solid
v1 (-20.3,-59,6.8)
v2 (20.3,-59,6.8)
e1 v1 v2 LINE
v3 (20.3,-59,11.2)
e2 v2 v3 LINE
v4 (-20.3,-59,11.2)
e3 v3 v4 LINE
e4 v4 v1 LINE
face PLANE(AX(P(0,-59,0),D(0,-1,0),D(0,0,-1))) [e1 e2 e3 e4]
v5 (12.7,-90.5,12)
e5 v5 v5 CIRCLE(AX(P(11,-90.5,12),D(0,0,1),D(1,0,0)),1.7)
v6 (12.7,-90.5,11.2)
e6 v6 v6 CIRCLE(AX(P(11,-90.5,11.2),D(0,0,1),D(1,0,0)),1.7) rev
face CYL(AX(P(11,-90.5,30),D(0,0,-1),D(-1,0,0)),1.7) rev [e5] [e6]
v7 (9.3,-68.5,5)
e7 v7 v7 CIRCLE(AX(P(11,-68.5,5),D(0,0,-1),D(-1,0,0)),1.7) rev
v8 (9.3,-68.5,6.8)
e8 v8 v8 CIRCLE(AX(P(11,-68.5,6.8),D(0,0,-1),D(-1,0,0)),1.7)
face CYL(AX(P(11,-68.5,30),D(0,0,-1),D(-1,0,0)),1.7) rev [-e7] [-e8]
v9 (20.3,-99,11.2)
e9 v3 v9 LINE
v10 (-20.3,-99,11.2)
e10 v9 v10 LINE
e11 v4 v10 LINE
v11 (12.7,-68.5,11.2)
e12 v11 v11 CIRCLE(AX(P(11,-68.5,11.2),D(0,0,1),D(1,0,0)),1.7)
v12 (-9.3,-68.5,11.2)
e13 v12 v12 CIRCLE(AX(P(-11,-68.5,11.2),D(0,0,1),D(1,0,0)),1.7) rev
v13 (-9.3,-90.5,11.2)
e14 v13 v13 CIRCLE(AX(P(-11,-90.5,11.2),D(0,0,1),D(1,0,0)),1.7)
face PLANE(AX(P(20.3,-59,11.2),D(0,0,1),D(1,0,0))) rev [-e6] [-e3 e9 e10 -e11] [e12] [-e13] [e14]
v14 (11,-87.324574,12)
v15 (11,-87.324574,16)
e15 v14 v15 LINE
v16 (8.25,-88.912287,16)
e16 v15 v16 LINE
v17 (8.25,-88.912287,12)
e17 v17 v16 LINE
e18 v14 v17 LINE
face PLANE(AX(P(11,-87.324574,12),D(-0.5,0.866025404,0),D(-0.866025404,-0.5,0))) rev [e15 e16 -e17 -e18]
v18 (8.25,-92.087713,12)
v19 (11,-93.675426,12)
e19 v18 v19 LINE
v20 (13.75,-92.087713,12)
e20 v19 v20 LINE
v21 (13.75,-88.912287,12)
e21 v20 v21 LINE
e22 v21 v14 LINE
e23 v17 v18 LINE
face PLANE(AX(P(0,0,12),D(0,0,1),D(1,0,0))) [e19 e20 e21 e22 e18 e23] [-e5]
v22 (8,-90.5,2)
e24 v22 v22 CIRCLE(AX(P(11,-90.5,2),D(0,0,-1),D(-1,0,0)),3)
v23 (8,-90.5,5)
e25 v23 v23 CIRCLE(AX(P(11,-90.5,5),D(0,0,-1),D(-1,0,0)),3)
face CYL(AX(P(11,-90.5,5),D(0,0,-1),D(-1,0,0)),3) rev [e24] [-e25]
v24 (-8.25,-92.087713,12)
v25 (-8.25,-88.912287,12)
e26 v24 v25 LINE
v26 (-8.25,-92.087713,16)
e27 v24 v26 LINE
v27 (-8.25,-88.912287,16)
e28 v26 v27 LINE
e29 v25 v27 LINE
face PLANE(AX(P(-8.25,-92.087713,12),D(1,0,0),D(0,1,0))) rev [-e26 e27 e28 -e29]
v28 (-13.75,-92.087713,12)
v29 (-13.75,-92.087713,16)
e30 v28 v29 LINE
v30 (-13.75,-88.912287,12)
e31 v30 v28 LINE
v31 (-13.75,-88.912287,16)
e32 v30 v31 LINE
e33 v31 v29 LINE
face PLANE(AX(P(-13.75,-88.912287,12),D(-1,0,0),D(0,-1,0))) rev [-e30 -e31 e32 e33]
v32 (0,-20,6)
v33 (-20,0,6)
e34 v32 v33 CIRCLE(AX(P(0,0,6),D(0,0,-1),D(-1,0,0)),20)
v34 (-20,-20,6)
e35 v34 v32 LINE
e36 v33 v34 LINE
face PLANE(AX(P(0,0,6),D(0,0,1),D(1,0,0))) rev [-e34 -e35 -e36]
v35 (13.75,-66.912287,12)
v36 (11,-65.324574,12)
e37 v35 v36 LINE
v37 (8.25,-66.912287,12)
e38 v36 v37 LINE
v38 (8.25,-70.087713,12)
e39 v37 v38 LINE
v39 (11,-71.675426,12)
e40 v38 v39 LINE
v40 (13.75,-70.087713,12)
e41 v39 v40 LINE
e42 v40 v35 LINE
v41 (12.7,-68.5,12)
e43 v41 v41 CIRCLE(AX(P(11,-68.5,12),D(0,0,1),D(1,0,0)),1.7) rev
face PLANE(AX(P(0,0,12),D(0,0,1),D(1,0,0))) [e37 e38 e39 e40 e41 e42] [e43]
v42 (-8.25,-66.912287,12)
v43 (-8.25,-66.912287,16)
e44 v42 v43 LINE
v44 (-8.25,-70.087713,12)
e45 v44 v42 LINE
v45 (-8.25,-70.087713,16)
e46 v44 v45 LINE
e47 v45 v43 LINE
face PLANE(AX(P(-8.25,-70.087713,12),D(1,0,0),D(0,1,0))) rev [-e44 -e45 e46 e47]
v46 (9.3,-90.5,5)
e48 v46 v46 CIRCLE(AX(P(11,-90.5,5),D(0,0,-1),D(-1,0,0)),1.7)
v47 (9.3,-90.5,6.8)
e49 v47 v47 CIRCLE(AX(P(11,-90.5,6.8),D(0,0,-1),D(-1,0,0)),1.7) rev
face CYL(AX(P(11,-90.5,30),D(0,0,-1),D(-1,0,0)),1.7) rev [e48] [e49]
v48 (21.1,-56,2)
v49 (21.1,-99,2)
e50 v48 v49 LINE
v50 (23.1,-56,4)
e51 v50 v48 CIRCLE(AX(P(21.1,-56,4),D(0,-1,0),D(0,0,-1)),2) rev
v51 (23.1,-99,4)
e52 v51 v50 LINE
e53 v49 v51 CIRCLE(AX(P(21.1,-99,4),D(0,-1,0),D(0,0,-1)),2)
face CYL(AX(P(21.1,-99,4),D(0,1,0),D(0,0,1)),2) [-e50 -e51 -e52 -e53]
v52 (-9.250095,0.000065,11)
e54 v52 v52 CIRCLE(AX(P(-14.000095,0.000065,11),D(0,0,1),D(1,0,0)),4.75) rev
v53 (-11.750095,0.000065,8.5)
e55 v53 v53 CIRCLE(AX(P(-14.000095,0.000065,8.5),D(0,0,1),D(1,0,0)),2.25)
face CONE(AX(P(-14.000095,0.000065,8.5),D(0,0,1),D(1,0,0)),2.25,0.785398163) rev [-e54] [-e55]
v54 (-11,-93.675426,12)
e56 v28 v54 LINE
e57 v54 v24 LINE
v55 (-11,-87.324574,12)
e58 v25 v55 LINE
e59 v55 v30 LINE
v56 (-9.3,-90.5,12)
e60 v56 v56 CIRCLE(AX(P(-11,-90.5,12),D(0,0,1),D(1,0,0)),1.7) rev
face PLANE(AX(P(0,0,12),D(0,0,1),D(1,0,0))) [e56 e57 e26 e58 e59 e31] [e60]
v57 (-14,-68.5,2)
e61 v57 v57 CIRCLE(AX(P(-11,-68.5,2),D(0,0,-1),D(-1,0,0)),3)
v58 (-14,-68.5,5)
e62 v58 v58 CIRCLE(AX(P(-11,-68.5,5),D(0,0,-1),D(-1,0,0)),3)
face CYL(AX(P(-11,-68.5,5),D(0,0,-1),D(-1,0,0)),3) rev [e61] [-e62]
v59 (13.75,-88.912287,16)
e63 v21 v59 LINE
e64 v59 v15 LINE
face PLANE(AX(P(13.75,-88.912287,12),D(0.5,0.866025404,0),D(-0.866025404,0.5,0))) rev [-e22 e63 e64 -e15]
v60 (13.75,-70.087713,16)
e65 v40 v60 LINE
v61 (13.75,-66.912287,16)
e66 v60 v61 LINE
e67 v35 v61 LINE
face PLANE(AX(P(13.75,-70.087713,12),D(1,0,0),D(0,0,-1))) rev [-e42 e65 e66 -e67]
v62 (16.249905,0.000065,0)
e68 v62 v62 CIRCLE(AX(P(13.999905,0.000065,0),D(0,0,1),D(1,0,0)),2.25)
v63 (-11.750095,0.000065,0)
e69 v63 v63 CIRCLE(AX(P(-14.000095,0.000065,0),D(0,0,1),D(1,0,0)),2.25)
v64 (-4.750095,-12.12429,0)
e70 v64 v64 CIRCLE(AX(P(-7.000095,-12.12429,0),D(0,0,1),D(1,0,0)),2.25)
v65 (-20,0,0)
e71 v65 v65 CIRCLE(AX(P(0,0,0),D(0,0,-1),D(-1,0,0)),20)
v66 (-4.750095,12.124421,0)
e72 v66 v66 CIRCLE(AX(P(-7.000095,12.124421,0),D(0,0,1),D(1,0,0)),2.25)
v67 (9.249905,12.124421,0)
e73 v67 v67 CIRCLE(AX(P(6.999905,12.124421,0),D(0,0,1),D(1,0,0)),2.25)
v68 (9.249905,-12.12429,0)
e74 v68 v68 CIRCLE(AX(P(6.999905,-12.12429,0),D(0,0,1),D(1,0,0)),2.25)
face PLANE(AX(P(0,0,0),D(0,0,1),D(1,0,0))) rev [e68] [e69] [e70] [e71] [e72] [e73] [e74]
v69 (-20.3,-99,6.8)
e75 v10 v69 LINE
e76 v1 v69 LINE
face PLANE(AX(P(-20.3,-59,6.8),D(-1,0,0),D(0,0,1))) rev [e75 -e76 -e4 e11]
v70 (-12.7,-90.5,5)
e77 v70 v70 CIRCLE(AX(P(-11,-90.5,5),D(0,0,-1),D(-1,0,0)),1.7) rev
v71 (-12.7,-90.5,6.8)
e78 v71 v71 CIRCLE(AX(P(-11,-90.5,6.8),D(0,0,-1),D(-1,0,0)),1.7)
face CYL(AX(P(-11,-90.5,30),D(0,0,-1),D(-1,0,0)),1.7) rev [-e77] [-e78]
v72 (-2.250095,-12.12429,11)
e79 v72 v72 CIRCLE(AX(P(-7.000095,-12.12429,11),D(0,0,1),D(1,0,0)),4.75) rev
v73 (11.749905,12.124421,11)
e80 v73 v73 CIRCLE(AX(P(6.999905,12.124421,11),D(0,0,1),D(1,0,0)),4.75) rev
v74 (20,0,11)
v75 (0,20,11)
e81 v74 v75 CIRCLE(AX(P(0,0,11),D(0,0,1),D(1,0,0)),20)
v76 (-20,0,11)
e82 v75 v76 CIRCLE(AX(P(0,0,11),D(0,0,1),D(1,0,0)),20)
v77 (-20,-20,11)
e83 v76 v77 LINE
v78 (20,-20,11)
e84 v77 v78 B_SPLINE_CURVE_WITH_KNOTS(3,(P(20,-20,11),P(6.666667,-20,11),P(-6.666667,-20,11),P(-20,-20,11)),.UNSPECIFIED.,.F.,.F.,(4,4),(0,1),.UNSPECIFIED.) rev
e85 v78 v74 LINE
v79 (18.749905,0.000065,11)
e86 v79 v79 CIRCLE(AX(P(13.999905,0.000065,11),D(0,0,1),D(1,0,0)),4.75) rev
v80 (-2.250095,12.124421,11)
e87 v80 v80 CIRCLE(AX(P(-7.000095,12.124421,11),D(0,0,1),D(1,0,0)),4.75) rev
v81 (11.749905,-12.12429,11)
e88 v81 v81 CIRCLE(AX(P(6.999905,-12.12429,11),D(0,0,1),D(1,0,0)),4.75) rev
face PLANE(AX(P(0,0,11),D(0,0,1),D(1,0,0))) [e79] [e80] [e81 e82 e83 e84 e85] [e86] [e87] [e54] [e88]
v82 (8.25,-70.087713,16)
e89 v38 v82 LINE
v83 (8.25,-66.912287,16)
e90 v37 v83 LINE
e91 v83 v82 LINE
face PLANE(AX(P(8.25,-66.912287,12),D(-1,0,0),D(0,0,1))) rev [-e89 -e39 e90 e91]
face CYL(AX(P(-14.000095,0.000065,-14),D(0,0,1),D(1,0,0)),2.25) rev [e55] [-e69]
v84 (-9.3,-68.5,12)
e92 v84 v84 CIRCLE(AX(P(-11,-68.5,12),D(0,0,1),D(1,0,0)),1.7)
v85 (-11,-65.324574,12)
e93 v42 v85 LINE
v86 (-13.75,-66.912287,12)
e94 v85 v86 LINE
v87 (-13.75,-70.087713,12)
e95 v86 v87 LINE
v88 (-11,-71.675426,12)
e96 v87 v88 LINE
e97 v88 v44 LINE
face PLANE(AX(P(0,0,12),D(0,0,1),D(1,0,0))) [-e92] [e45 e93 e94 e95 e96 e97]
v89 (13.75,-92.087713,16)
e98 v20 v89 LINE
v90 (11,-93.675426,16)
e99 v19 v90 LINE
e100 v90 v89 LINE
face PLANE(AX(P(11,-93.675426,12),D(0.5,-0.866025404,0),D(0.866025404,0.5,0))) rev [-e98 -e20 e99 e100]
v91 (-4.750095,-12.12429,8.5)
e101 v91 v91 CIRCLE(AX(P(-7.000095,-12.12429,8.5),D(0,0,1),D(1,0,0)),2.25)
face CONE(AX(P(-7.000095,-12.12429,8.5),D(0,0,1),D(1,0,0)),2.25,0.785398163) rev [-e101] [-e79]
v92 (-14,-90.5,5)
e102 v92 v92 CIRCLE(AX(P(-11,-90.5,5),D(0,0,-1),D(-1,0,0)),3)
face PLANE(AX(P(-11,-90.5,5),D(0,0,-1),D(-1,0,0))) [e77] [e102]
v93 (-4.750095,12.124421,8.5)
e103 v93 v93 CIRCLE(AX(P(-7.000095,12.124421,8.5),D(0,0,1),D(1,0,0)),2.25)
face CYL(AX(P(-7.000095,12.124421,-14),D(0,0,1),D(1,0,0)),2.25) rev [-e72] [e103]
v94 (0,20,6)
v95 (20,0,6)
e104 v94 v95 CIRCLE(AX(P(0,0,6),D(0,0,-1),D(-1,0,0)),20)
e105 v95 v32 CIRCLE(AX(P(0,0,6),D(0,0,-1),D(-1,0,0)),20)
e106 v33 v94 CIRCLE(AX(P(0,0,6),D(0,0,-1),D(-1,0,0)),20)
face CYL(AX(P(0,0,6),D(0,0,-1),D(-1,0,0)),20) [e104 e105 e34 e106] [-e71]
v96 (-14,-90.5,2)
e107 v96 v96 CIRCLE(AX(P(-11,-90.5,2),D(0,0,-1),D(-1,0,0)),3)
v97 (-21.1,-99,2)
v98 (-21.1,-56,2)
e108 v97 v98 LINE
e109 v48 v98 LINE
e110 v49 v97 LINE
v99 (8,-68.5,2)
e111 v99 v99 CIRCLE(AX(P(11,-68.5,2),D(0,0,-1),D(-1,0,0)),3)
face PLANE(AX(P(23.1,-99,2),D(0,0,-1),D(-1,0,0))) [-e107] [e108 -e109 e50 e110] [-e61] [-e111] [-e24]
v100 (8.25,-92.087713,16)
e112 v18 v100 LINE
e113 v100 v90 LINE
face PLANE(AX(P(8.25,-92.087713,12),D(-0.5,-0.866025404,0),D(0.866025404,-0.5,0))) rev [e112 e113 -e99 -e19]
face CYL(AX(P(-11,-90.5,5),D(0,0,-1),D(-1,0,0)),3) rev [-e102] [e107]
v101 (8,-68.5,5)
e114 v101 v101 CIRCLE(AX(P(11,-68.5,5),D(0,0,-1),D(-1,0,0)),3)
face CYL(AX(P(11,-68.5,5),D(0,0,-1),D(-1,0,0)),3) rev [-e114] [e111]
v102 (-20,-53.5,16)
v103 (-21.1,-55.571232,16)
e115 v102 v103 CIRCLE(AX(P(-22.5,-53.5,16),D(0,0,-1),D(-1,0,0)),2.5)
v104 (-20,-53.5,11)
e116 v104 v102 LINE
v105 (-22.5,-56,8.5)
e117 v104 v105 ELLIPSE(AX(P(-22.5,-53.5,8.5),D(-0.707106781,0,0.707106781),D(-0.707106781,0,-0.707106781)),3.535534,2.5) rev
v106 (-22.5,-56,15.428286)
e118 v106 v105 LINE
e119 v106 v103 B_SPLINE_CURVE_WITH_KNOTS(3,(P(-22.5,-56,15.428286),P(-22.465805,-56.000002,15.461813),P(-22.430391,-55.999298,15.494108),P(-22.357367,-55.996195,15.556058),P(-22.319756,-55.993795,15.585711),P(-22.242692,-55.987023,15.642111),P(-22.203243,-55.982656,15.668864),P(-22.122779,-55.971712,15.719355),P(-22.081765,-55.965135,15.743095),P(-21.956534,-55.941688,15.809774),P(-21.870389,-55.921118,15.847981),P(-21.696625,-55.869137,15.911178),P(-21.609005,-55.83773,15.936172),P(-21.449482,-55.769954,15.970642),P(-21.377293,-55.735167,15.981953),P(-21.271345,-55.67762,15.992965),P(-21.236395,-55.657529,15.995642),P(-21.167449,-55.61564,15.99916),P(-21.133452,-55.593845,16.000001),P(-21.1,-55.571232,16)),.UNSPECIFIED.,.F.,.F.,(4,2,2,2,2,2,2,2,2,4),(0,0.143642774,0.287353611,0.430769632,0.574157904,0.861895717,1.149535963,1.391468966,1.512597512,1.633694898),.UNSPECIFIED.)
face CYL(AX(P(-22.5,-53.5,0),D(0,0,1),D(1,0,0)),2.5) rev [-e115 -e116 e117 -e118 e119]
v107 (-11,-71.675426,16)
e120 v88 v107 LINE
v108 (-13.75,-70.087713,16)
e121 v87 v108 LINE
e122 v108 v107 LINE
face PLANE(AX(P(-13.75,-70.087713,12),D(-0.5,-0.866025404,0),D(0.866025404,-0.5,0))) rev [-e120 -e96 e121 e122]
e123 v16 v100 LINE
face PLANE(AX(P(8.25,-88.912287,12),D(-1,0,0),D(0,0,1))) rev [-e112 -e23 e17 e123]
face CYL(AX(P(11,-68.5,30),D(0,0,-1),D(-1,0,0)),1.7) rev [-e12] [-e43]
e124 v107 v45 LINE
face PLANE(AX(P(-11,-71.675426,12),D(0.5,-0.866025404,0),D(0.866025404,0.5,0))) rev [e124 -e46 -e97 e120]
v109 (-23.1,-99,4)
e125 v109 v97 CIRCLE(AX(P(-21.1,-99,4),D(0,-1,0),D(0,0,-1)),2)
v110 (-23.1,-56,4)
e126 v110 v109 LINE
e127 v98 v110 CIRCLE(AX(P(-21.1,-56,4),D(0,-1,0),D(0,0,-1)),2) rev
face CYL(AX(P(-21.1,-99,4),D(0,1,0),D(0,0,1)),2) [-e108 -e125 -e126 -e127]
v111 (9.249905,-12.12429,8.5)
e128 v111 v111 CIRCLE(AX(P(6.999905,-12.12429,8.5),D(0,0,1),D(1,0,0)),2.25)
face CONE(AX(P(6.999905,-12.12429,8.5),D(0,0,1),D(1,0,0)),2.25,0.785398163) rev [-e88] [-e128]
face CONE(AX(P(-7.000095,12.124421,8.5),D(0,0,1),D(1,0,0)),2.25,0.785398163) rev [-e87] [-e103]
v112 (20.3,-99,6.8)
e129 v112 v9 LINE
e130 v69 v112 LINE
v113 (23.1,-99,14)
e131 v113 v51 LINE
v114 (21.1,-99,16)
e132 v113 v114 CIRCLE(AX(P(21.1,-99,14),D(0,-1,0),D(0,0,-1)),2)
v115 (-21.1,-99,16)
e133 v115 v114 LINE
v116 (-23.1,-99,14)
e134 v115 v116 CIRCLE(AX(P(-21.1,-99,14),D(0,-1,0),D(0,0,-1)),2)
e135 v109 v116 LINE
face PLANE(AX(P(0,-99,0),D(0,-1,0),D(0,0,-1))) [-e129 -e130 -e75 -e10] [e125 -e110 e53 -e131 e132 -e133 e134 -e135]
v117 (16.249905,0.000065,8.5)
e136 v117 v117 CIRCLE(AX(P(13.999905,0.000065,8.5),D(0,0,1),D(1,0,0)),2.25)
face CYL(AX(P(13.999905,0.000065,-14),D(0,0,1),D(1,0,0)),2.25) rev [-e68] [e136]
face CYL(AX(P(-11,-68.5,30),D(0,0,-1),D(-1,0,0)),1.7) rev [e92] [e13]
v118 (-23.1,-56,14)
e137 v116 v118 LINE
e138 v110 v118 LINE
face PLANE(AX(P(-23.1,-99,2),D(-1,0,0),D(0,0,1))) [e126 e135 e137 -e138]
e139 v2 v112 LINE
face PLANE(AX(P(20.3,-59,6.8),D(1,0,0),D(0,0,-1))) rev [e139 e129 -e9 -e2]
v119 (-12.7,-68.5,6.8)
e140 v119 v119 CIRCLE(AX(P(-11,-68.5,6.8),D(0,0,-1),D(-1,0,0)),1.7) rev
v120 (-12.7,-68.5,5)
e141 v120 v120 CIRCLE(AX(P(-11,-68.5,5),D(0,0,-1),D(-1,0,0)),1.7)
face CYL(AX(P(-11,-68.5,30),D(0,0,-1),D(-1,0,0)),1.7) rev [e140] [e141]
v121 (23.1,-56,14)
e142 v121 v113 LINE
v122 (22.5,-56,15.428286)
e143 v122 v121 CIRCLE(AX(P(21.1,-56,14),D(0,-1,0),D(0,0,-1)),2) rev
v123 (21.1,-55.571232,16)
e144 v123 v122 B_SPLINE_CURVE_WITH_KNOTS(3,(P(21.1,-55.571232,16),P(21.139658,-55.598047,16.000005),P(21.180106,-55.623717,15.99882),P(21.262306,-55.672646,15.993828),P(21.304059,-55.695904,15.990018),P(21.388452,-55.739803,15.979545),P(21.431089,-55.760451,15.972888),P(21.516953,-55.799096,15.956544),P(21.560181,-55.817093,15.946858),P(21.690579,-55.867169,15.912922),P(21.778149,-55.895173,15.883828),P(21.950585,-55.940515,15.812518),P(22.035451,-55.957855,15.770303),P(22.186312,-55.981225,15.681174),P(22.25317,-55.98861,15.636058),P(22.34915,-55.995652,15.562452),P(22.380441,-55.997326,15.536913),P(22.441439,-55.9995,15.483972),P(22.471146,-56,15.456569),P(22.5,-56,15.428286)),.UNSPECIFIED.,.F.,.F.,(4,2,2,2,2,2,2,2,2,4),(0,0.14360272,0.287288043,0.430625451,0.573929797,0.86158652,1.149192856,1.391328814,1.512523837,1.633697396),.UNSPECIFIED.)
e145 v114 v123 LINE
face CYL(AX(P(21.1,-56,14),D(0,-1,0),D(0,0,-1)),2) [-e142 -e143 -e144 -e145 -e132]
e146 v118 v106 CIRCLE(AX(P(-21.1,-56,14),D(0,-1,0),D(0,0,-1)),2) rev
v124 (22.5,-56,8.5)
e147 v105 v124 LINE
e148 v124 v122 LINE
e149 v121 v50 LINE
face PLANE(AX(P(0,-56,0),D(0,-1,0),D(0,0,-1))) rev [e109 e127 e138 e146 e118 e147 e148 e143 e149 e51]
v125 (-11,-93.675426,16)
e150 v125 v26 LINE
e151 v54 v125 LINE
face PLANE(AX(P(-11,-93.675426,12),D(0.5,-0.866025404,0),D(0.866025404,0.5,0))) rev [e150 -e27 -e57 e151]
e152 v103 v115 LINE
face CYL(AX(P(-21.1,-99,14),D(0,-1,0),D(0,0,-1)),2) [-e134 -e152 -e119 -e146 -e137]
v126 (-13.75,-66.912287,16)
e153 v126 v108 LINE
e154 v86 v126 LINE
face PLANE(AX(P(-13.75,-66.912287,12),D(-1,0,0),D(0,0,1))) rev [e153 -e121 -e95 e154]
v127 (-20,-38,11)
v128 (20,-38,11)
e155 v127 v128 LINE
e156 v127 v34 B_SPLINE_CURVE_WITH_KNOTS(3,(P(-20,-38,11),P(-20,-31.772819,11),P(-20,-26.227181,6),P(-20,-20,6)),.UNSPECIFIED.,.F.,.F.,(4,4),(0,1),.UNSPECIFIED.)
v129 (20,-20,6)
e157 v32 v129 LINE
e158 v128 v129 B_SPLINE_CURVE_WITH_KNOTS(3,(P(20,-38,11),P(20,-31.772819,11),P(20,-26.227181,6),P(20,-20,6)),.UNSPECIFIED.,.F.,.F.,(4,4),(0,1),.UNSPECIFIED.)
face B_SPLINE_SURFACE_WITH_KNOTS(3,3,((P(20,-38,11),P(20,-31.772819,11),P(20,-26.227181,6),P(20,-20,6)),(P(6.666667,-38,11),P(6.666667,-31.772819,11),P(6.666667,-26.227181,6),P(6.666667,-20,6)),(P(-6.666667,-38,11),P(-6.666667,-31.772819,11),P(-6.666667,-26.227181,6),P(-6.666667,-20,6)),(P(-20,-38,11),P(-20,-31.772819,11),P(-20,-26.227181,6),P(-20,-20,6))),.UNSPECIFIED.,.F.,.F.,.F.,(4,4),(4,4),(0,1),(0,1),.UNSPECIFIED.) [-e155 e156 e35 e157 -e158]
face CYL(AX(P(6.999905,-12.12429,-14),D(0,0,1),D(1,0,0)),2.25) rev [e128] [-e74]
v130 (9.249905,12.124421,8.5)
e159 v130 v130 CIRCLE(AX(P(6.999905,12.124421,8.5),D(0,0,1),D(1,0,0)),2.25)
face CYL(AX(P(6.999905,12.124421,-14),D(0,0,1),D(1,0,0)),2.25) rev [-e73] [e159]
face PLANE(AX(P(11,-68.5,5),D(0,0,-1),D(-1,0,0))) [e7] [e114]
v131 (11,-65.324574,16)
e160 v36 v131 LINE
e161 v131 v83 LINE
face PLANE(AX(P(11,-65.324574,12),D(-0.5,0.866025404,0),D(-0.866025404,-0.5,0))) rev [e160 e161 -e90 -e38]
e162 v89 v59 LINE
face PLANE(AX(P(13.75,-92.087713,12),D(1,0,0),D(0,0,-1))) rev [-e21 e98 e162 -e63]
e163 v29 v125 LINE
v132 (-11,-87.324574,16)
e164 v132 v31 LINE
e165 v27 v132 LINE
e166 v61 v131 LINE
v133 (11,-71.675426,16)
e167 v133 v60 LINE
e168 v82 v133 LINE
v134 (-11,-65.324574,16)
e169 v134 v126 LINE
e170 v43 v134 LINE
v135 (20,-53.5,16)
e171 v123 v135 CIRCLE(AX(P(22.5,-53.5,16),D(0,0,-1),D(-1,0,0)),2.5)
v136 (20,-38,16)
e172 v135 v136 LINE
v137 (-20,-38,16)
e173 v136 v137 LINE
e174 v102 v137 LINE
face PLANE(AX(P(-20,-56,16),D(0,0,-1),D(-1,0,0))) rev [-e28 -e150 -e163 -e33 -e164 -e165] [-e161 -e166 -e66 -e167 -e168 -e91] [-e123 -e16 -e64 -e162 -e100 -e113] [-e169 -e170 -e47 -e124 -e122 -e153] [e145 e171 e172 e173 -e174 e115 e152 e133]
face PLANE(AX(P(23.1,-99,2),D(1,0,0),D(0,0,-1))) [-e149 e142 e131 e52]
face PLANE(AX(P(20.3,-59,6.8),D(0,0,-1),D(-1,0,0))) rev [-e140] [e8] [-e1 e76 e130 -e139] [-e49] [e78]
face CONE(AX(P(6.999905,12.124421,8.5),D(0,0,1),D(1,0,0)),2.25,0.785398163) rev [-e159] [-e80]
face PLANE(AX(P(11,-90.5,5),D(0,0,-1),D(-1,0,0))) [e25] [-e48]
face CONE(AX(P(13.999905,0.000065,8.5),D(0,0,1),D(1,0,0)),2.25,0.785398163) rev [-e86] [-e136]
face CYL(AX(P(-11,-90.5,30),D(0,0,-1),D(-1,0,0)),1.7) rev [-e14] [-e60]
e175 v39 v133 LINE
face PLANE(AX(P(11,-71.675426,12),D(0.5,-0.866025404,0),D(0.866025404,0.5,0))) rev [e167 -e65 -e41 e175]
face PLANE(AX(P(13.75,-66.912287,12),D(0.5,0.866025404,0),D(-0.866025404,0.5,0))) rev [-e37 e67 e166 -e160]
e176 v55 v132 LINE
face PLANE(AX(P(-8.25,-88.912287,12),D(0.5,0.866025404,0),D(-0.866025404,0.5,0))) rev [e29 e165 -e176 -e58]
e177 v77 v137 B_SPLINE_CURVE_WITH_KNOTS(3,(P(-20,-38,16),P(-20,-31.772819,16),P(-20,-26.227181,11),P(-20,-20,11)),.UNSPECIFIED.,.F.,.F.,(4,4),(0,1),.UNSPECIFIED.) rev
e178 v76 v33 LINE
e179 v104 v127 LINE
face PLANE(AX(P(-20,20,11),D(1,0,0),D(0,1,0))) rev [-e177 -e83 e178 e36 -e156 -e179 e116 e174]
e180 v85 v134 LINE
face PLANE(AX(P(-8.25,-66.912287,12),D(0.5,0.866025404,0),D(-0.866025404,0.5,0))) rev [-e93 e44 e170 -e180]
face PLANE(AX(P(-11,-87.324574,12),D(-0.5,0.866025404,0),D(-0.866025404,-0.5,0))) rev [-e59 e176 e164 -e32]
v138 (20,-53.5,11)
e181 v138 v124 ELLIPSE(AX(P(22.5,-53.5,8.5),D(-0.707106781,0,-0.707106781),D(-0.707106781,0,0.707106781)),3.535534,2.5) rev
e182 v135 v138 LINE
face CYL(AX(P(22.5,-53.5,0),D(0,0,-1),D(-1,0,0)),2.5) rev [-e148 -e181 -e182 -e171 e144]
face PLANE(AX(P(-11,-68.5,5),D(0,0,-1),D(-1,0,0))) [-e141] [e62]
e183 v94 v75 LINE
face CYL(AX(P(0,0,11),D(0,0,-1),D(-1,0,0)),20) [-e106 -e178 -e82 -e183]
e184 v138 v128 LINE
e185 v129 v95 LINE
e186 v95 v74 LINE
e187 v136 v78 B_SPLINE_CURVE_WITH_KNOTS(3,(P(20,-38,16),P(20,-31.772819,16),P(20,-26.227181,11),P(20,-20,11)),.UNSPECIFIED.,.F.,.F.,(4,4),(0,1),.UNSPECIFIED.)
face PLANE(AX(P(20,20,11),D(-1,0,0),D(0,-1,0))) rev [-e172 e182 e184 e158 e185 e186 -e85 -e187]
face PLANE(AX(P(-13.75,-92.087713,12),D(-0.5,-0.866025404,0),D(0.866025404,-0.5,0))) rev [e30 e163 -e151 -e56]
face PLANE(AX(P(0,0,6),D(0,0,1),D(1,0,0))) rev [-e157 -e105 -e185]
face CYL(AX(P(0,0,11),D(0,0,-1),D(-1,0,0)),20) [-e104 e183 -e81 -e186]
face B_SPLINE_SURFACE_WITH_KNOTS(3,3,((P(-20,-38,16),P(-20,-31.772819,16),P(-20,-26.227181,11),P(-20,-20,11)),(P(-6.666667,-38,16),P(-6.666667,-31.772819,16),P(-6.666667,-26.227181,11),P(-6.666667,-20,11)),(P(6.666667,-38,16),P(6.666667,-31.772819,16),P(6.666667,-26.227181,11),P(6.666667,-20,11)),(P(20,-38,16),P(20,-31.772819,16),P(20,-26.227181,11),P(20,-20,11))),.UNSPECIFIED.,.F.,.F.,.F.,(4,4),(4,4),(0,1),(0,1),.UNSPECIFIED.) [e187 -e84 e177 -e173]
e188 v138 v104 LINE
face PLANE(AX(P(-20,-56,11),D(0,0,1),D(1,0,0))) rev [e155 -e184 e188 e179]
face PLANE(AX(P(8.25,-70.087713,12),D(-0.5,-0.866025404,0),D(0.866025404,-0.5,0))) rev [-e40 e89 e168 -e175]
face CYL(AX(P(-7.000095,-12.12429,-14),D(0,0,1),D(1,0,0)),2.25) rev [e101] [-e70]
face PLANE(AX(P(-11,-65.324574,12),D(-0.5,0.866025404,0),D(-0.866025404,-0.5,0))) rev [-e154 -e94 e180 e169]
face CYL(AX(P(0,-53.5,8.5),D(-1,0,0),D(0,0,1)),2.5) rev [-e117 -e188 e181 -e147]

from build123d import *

# Parameters (mm, degrees)
SKETCH7_W           = 40
SKETCH7_H           = 40
BOSS_EXTRUDE1_DEPTH = 11
LOFT1_START         = -20
LOFT1_DEPTH         = 40
SKETCH16_W          = 49.026286786
SKETCH16_H          = 65.242270374
SKETCH16_R          = 20
CUT_EXTRUDE3_DEPTH  = 6
SKETCH17_W          = 40
SKETCH17_H          = 5
BOSS_EXTRUDE5_DEPTH = 18
SKETCH10_R          = 2.25
CUT_EXTRUDE1_DEPTH  = 25
CHAMFER1_SIZE       = 2.5
FILLET3_R           = 20
SKETCH11_W          = 46.2
SKETCH11_H          = 14
BOSS_EXTRUDE6_DEPTH = 43
FILLET9_R           = 2.5
SKETCH20_W          = 40.6
SKETCH20_H          = 4.4
CUT_EXTRUDE4_DEPTH  = 40
SKETCH22_R          = 1.7
CUT_EXTRUDE5_DEPTH  = 30
FILLET11_R          = 2
CUT_EXTRUDE6_DEPTH  = 4
SKETCH24_R          = 3
CUT_EXTRUDE7_DEPTH  = 3


# Read off the part's stored shape, not the designer's step: Loft1
with BuildPart() as part:
    # Sketch7 → Boss-Extrude1 (new body)
    with BuildSketch(Plane.XY):
        Rectangle(SKETCH7_W, SKETCH7_H)
    extrude(amount=BOSS_EXTRUDE1_DEPTH)

    # Loft1 outline → Loft1 (add)
    with BuildSketch(Plane.YZ.offset(LOFT1_START)):
        with BuildLine():
            add(Edge.make_bspline(
                [(-38, 16), (-31.772819436, 16), (-26.227180564, 11), (-20, 11)],
                knots=[0, 0, 0, 0, 1, 1, 1, 1], degree=3))
            Line((-38, 16), (-38, 11))
            add(Edge.make_bspline(
                [(-38, 11), (-31.772819436, 11), (-26.227180564, 6), (-20, 6)],
                knots=[0, 0, 0, 0, 1, 1, 1, 1], degree=3))
            Line((-20, 6), (-20, 11))
        make_face()
    extrude(amount=LOFT1_DEPTH)

    # Sketch16 → Cut-Extrude3 (cut)
    with BuildSketch(Plane(origin=(0, 0, 0), x_dir=(-1, 0, 0), z_dir=(0, 0, -1))):
        Rectangle(SKETCH16_W, SKETCH16_H)
        Circle(SKETCH16_R, mode=Mode.SUBTRACT)
    extrude(amount=-CUT_EXTRUDE3_DEPTH, mode=Mode.SUBTRACT)

    # Sketch17 → Boss-Extrude5 (add)
    with BuildSketch(Plane(origin=(0, -38, 0), x_dir=(-1, 0, 0), z_dir=(0, -1, 0))):
        with Locations((0, -13.5)):
            Rectangle(SKETCH17_W, SKETCH17_H)
    extrude(amount=BOSS_EXTRUDE5_DEPTH)

    # Sketch10 → Cut-Extrude1 (cut)
    with BuildSketch(Plane.XY.offset(11)):
        with Locations((-7.00009521, 12.124420806)):
            Circle(SKETCH10_R)
        with Locations((6.99990479, 12.124420806)):
            Circle(SKETCH10_R)
        with Locations((13.99990479, 6.5153e-05)):
            Circle(SKETCH10_R)
        with Locations((6.99990479, -12.1242905)):
            Circle(SKETCH10_R)
        with Locations((-7.00009521, -12.1242905)):
            Circle(SKETCH10_R)
        with Locations((-14.00009521, 6.5153e-05)):
            Circle(SKETCH10_R)
    extrude(amount=-CUT_EXTRUDE1_DEPTH, mode=Mode.SUBTRACT)

    # Chamfer1
    chamfer1_edges = [part.edges().sort_by_distance(p)[0] for p in [
        (4.74990479, 12.124420806, 11),
        (-9.25009521, 12.124420806, 11),
        (-16.25009521, 6.5153e-05, 11),
        (-9.25009521, -12.1242905, 11),
        (4.74990479, -12.1242905, 11),
        (11.74990479, 6.5153e-05, 11),
    ]]
    chamfer(chamfer1_edges, length=CHAMFER1_SIZE)

    # Fillet3
    fillet3_edges = [part.edges().sort_by_distance(p)[0] for p in [
        (20, 20, 8.5),
        (-20, 20, 8.5),
    ]]
    fillet(fillet3_edges, radius=FILLET3_R - 0.0001)  # a hair under: the kernel refuses the full size

    # Sketch11 → Boss-Extrude6 (add)
    with BuildSketch(Plane(origin=(0, -56, -3.472963553), x_dir=(1, 0, 0), z_dir=(0, 1, 0))):
        with Locations((0, -12.472963553)):
            Rectangle(SKETCH11_W, SKETCH11_H)
    extrude(amount=-BOSS_EXTRUDE6_DEPTH)

    # Fillet9
    fillet9_edges = [part.edges().sort_by_distance(p)[0] for p in [
        (0, -56, 11),
        (-20, -56, 13.5),
        (20, -56, 13.5),
    ]]
    fillet(fillet9_edges, radius=FILLET9_R)

    # Sketch20 → Cut-Extrude4 (cut)
    with BuildSketch(Plane.XZ.offset(99)):
        with Locations((0, 9)):
            Rectangle(SKETCH20_W, SKETCH20_H)
    extrude(amount=-CUT_EXTRUDE4_DEPTH, mode=Mode.SUBTRACT)

    # Sketch22 → Cut-Extrude5 (cut)
    with BuildSketch(Plane.XY):
        with Locations(Location((11, -68.5, 0), (0, 0, 180))):
            Circle(SKETCH22_R)
        with Locations(Location((11, -90.5, 0), (0, 0, 180))):
            Circle(SKETCH22_R)
        with Locations(Location((-11, -90.5, 0), (0, 0, 180))):
            Circle(SKETCH22_R)
        with Locations(Location((-11, -68.5, 0), (0, 0, 180))):
            Circle(SKETCH22_R)
    extrude(amount=CUT_EXTRUDE5_DEPTH, mode=Mode.SUBTRACT)

    # Fillet11
    fillet11_edges = [part.edges().sort_by_distance(p)[0] for p in [
        (-23.1, -77.5, 16),
        (-23.1, -77.5, 2),
        (23.1, -77.5, 16),
        (23.1, -77.5, 2),
    ]]
    fillet(fillet11_edges, radius=FILLET11_R)

    # Sketch23 → Cut-Extrude6 (cut)
    with BuildSketch(Plane.XY.offset(16)):
        Polygon((-11, -65.324573519), (-13.75, -66.91228676), (-13.75, -70.08771324), (-11, -71.675426481), (-8.25, -70.08771324), (-8.25, -66.91228676), align=None)
        Polygon((11, -65.324573519), (8.25, -66.91228676), (8.25, -70.08771324), (11, -71.675426481), (13.75, -70.08771324), (13.75, -66.91228676), align=None)
        Polygon((11, -87.324573519), (8.25, -88.91228676), (8.25, -92.08771324), (11, -93.675426481), (13.75, -92.08771324), (13.75, -88.91228676), align=None)
        Polygon((-11, -87.324573519), (-13.75, -88.91228676), (-13.75, -92.08771324), (-11, -93.675426481), (-8.25, -92.08771324), (-8.25, -88.91228676), align=None)
    extrude(amount=-CUT_EXTRUDE6_DEPTH, mode=Mode.SUBTRACT)

    # Sketch24 → Cut-Extrude7 (cut)
    with BuildSketch(Plane(origin=(0, 0, 2), x_dir=(-1, 0, 0), z_dir=(0, 0, -1))):
        with Locations((-11, -68.5)):
            Circle(SKETCH24_R)
        with Locations((11, -68.5)):
            Circle(SKETCH24_R)
        with Locations((11, -90.5)):
            Circle(SKETCH24_R)
        with Locations((-11, -90.5)):
            Circle(SKETCH24_R)
    extrude(amount=-CUT_EXTRUDE7_DEPTH, mode=Mode.SUBTRACT)


solid = part.part
